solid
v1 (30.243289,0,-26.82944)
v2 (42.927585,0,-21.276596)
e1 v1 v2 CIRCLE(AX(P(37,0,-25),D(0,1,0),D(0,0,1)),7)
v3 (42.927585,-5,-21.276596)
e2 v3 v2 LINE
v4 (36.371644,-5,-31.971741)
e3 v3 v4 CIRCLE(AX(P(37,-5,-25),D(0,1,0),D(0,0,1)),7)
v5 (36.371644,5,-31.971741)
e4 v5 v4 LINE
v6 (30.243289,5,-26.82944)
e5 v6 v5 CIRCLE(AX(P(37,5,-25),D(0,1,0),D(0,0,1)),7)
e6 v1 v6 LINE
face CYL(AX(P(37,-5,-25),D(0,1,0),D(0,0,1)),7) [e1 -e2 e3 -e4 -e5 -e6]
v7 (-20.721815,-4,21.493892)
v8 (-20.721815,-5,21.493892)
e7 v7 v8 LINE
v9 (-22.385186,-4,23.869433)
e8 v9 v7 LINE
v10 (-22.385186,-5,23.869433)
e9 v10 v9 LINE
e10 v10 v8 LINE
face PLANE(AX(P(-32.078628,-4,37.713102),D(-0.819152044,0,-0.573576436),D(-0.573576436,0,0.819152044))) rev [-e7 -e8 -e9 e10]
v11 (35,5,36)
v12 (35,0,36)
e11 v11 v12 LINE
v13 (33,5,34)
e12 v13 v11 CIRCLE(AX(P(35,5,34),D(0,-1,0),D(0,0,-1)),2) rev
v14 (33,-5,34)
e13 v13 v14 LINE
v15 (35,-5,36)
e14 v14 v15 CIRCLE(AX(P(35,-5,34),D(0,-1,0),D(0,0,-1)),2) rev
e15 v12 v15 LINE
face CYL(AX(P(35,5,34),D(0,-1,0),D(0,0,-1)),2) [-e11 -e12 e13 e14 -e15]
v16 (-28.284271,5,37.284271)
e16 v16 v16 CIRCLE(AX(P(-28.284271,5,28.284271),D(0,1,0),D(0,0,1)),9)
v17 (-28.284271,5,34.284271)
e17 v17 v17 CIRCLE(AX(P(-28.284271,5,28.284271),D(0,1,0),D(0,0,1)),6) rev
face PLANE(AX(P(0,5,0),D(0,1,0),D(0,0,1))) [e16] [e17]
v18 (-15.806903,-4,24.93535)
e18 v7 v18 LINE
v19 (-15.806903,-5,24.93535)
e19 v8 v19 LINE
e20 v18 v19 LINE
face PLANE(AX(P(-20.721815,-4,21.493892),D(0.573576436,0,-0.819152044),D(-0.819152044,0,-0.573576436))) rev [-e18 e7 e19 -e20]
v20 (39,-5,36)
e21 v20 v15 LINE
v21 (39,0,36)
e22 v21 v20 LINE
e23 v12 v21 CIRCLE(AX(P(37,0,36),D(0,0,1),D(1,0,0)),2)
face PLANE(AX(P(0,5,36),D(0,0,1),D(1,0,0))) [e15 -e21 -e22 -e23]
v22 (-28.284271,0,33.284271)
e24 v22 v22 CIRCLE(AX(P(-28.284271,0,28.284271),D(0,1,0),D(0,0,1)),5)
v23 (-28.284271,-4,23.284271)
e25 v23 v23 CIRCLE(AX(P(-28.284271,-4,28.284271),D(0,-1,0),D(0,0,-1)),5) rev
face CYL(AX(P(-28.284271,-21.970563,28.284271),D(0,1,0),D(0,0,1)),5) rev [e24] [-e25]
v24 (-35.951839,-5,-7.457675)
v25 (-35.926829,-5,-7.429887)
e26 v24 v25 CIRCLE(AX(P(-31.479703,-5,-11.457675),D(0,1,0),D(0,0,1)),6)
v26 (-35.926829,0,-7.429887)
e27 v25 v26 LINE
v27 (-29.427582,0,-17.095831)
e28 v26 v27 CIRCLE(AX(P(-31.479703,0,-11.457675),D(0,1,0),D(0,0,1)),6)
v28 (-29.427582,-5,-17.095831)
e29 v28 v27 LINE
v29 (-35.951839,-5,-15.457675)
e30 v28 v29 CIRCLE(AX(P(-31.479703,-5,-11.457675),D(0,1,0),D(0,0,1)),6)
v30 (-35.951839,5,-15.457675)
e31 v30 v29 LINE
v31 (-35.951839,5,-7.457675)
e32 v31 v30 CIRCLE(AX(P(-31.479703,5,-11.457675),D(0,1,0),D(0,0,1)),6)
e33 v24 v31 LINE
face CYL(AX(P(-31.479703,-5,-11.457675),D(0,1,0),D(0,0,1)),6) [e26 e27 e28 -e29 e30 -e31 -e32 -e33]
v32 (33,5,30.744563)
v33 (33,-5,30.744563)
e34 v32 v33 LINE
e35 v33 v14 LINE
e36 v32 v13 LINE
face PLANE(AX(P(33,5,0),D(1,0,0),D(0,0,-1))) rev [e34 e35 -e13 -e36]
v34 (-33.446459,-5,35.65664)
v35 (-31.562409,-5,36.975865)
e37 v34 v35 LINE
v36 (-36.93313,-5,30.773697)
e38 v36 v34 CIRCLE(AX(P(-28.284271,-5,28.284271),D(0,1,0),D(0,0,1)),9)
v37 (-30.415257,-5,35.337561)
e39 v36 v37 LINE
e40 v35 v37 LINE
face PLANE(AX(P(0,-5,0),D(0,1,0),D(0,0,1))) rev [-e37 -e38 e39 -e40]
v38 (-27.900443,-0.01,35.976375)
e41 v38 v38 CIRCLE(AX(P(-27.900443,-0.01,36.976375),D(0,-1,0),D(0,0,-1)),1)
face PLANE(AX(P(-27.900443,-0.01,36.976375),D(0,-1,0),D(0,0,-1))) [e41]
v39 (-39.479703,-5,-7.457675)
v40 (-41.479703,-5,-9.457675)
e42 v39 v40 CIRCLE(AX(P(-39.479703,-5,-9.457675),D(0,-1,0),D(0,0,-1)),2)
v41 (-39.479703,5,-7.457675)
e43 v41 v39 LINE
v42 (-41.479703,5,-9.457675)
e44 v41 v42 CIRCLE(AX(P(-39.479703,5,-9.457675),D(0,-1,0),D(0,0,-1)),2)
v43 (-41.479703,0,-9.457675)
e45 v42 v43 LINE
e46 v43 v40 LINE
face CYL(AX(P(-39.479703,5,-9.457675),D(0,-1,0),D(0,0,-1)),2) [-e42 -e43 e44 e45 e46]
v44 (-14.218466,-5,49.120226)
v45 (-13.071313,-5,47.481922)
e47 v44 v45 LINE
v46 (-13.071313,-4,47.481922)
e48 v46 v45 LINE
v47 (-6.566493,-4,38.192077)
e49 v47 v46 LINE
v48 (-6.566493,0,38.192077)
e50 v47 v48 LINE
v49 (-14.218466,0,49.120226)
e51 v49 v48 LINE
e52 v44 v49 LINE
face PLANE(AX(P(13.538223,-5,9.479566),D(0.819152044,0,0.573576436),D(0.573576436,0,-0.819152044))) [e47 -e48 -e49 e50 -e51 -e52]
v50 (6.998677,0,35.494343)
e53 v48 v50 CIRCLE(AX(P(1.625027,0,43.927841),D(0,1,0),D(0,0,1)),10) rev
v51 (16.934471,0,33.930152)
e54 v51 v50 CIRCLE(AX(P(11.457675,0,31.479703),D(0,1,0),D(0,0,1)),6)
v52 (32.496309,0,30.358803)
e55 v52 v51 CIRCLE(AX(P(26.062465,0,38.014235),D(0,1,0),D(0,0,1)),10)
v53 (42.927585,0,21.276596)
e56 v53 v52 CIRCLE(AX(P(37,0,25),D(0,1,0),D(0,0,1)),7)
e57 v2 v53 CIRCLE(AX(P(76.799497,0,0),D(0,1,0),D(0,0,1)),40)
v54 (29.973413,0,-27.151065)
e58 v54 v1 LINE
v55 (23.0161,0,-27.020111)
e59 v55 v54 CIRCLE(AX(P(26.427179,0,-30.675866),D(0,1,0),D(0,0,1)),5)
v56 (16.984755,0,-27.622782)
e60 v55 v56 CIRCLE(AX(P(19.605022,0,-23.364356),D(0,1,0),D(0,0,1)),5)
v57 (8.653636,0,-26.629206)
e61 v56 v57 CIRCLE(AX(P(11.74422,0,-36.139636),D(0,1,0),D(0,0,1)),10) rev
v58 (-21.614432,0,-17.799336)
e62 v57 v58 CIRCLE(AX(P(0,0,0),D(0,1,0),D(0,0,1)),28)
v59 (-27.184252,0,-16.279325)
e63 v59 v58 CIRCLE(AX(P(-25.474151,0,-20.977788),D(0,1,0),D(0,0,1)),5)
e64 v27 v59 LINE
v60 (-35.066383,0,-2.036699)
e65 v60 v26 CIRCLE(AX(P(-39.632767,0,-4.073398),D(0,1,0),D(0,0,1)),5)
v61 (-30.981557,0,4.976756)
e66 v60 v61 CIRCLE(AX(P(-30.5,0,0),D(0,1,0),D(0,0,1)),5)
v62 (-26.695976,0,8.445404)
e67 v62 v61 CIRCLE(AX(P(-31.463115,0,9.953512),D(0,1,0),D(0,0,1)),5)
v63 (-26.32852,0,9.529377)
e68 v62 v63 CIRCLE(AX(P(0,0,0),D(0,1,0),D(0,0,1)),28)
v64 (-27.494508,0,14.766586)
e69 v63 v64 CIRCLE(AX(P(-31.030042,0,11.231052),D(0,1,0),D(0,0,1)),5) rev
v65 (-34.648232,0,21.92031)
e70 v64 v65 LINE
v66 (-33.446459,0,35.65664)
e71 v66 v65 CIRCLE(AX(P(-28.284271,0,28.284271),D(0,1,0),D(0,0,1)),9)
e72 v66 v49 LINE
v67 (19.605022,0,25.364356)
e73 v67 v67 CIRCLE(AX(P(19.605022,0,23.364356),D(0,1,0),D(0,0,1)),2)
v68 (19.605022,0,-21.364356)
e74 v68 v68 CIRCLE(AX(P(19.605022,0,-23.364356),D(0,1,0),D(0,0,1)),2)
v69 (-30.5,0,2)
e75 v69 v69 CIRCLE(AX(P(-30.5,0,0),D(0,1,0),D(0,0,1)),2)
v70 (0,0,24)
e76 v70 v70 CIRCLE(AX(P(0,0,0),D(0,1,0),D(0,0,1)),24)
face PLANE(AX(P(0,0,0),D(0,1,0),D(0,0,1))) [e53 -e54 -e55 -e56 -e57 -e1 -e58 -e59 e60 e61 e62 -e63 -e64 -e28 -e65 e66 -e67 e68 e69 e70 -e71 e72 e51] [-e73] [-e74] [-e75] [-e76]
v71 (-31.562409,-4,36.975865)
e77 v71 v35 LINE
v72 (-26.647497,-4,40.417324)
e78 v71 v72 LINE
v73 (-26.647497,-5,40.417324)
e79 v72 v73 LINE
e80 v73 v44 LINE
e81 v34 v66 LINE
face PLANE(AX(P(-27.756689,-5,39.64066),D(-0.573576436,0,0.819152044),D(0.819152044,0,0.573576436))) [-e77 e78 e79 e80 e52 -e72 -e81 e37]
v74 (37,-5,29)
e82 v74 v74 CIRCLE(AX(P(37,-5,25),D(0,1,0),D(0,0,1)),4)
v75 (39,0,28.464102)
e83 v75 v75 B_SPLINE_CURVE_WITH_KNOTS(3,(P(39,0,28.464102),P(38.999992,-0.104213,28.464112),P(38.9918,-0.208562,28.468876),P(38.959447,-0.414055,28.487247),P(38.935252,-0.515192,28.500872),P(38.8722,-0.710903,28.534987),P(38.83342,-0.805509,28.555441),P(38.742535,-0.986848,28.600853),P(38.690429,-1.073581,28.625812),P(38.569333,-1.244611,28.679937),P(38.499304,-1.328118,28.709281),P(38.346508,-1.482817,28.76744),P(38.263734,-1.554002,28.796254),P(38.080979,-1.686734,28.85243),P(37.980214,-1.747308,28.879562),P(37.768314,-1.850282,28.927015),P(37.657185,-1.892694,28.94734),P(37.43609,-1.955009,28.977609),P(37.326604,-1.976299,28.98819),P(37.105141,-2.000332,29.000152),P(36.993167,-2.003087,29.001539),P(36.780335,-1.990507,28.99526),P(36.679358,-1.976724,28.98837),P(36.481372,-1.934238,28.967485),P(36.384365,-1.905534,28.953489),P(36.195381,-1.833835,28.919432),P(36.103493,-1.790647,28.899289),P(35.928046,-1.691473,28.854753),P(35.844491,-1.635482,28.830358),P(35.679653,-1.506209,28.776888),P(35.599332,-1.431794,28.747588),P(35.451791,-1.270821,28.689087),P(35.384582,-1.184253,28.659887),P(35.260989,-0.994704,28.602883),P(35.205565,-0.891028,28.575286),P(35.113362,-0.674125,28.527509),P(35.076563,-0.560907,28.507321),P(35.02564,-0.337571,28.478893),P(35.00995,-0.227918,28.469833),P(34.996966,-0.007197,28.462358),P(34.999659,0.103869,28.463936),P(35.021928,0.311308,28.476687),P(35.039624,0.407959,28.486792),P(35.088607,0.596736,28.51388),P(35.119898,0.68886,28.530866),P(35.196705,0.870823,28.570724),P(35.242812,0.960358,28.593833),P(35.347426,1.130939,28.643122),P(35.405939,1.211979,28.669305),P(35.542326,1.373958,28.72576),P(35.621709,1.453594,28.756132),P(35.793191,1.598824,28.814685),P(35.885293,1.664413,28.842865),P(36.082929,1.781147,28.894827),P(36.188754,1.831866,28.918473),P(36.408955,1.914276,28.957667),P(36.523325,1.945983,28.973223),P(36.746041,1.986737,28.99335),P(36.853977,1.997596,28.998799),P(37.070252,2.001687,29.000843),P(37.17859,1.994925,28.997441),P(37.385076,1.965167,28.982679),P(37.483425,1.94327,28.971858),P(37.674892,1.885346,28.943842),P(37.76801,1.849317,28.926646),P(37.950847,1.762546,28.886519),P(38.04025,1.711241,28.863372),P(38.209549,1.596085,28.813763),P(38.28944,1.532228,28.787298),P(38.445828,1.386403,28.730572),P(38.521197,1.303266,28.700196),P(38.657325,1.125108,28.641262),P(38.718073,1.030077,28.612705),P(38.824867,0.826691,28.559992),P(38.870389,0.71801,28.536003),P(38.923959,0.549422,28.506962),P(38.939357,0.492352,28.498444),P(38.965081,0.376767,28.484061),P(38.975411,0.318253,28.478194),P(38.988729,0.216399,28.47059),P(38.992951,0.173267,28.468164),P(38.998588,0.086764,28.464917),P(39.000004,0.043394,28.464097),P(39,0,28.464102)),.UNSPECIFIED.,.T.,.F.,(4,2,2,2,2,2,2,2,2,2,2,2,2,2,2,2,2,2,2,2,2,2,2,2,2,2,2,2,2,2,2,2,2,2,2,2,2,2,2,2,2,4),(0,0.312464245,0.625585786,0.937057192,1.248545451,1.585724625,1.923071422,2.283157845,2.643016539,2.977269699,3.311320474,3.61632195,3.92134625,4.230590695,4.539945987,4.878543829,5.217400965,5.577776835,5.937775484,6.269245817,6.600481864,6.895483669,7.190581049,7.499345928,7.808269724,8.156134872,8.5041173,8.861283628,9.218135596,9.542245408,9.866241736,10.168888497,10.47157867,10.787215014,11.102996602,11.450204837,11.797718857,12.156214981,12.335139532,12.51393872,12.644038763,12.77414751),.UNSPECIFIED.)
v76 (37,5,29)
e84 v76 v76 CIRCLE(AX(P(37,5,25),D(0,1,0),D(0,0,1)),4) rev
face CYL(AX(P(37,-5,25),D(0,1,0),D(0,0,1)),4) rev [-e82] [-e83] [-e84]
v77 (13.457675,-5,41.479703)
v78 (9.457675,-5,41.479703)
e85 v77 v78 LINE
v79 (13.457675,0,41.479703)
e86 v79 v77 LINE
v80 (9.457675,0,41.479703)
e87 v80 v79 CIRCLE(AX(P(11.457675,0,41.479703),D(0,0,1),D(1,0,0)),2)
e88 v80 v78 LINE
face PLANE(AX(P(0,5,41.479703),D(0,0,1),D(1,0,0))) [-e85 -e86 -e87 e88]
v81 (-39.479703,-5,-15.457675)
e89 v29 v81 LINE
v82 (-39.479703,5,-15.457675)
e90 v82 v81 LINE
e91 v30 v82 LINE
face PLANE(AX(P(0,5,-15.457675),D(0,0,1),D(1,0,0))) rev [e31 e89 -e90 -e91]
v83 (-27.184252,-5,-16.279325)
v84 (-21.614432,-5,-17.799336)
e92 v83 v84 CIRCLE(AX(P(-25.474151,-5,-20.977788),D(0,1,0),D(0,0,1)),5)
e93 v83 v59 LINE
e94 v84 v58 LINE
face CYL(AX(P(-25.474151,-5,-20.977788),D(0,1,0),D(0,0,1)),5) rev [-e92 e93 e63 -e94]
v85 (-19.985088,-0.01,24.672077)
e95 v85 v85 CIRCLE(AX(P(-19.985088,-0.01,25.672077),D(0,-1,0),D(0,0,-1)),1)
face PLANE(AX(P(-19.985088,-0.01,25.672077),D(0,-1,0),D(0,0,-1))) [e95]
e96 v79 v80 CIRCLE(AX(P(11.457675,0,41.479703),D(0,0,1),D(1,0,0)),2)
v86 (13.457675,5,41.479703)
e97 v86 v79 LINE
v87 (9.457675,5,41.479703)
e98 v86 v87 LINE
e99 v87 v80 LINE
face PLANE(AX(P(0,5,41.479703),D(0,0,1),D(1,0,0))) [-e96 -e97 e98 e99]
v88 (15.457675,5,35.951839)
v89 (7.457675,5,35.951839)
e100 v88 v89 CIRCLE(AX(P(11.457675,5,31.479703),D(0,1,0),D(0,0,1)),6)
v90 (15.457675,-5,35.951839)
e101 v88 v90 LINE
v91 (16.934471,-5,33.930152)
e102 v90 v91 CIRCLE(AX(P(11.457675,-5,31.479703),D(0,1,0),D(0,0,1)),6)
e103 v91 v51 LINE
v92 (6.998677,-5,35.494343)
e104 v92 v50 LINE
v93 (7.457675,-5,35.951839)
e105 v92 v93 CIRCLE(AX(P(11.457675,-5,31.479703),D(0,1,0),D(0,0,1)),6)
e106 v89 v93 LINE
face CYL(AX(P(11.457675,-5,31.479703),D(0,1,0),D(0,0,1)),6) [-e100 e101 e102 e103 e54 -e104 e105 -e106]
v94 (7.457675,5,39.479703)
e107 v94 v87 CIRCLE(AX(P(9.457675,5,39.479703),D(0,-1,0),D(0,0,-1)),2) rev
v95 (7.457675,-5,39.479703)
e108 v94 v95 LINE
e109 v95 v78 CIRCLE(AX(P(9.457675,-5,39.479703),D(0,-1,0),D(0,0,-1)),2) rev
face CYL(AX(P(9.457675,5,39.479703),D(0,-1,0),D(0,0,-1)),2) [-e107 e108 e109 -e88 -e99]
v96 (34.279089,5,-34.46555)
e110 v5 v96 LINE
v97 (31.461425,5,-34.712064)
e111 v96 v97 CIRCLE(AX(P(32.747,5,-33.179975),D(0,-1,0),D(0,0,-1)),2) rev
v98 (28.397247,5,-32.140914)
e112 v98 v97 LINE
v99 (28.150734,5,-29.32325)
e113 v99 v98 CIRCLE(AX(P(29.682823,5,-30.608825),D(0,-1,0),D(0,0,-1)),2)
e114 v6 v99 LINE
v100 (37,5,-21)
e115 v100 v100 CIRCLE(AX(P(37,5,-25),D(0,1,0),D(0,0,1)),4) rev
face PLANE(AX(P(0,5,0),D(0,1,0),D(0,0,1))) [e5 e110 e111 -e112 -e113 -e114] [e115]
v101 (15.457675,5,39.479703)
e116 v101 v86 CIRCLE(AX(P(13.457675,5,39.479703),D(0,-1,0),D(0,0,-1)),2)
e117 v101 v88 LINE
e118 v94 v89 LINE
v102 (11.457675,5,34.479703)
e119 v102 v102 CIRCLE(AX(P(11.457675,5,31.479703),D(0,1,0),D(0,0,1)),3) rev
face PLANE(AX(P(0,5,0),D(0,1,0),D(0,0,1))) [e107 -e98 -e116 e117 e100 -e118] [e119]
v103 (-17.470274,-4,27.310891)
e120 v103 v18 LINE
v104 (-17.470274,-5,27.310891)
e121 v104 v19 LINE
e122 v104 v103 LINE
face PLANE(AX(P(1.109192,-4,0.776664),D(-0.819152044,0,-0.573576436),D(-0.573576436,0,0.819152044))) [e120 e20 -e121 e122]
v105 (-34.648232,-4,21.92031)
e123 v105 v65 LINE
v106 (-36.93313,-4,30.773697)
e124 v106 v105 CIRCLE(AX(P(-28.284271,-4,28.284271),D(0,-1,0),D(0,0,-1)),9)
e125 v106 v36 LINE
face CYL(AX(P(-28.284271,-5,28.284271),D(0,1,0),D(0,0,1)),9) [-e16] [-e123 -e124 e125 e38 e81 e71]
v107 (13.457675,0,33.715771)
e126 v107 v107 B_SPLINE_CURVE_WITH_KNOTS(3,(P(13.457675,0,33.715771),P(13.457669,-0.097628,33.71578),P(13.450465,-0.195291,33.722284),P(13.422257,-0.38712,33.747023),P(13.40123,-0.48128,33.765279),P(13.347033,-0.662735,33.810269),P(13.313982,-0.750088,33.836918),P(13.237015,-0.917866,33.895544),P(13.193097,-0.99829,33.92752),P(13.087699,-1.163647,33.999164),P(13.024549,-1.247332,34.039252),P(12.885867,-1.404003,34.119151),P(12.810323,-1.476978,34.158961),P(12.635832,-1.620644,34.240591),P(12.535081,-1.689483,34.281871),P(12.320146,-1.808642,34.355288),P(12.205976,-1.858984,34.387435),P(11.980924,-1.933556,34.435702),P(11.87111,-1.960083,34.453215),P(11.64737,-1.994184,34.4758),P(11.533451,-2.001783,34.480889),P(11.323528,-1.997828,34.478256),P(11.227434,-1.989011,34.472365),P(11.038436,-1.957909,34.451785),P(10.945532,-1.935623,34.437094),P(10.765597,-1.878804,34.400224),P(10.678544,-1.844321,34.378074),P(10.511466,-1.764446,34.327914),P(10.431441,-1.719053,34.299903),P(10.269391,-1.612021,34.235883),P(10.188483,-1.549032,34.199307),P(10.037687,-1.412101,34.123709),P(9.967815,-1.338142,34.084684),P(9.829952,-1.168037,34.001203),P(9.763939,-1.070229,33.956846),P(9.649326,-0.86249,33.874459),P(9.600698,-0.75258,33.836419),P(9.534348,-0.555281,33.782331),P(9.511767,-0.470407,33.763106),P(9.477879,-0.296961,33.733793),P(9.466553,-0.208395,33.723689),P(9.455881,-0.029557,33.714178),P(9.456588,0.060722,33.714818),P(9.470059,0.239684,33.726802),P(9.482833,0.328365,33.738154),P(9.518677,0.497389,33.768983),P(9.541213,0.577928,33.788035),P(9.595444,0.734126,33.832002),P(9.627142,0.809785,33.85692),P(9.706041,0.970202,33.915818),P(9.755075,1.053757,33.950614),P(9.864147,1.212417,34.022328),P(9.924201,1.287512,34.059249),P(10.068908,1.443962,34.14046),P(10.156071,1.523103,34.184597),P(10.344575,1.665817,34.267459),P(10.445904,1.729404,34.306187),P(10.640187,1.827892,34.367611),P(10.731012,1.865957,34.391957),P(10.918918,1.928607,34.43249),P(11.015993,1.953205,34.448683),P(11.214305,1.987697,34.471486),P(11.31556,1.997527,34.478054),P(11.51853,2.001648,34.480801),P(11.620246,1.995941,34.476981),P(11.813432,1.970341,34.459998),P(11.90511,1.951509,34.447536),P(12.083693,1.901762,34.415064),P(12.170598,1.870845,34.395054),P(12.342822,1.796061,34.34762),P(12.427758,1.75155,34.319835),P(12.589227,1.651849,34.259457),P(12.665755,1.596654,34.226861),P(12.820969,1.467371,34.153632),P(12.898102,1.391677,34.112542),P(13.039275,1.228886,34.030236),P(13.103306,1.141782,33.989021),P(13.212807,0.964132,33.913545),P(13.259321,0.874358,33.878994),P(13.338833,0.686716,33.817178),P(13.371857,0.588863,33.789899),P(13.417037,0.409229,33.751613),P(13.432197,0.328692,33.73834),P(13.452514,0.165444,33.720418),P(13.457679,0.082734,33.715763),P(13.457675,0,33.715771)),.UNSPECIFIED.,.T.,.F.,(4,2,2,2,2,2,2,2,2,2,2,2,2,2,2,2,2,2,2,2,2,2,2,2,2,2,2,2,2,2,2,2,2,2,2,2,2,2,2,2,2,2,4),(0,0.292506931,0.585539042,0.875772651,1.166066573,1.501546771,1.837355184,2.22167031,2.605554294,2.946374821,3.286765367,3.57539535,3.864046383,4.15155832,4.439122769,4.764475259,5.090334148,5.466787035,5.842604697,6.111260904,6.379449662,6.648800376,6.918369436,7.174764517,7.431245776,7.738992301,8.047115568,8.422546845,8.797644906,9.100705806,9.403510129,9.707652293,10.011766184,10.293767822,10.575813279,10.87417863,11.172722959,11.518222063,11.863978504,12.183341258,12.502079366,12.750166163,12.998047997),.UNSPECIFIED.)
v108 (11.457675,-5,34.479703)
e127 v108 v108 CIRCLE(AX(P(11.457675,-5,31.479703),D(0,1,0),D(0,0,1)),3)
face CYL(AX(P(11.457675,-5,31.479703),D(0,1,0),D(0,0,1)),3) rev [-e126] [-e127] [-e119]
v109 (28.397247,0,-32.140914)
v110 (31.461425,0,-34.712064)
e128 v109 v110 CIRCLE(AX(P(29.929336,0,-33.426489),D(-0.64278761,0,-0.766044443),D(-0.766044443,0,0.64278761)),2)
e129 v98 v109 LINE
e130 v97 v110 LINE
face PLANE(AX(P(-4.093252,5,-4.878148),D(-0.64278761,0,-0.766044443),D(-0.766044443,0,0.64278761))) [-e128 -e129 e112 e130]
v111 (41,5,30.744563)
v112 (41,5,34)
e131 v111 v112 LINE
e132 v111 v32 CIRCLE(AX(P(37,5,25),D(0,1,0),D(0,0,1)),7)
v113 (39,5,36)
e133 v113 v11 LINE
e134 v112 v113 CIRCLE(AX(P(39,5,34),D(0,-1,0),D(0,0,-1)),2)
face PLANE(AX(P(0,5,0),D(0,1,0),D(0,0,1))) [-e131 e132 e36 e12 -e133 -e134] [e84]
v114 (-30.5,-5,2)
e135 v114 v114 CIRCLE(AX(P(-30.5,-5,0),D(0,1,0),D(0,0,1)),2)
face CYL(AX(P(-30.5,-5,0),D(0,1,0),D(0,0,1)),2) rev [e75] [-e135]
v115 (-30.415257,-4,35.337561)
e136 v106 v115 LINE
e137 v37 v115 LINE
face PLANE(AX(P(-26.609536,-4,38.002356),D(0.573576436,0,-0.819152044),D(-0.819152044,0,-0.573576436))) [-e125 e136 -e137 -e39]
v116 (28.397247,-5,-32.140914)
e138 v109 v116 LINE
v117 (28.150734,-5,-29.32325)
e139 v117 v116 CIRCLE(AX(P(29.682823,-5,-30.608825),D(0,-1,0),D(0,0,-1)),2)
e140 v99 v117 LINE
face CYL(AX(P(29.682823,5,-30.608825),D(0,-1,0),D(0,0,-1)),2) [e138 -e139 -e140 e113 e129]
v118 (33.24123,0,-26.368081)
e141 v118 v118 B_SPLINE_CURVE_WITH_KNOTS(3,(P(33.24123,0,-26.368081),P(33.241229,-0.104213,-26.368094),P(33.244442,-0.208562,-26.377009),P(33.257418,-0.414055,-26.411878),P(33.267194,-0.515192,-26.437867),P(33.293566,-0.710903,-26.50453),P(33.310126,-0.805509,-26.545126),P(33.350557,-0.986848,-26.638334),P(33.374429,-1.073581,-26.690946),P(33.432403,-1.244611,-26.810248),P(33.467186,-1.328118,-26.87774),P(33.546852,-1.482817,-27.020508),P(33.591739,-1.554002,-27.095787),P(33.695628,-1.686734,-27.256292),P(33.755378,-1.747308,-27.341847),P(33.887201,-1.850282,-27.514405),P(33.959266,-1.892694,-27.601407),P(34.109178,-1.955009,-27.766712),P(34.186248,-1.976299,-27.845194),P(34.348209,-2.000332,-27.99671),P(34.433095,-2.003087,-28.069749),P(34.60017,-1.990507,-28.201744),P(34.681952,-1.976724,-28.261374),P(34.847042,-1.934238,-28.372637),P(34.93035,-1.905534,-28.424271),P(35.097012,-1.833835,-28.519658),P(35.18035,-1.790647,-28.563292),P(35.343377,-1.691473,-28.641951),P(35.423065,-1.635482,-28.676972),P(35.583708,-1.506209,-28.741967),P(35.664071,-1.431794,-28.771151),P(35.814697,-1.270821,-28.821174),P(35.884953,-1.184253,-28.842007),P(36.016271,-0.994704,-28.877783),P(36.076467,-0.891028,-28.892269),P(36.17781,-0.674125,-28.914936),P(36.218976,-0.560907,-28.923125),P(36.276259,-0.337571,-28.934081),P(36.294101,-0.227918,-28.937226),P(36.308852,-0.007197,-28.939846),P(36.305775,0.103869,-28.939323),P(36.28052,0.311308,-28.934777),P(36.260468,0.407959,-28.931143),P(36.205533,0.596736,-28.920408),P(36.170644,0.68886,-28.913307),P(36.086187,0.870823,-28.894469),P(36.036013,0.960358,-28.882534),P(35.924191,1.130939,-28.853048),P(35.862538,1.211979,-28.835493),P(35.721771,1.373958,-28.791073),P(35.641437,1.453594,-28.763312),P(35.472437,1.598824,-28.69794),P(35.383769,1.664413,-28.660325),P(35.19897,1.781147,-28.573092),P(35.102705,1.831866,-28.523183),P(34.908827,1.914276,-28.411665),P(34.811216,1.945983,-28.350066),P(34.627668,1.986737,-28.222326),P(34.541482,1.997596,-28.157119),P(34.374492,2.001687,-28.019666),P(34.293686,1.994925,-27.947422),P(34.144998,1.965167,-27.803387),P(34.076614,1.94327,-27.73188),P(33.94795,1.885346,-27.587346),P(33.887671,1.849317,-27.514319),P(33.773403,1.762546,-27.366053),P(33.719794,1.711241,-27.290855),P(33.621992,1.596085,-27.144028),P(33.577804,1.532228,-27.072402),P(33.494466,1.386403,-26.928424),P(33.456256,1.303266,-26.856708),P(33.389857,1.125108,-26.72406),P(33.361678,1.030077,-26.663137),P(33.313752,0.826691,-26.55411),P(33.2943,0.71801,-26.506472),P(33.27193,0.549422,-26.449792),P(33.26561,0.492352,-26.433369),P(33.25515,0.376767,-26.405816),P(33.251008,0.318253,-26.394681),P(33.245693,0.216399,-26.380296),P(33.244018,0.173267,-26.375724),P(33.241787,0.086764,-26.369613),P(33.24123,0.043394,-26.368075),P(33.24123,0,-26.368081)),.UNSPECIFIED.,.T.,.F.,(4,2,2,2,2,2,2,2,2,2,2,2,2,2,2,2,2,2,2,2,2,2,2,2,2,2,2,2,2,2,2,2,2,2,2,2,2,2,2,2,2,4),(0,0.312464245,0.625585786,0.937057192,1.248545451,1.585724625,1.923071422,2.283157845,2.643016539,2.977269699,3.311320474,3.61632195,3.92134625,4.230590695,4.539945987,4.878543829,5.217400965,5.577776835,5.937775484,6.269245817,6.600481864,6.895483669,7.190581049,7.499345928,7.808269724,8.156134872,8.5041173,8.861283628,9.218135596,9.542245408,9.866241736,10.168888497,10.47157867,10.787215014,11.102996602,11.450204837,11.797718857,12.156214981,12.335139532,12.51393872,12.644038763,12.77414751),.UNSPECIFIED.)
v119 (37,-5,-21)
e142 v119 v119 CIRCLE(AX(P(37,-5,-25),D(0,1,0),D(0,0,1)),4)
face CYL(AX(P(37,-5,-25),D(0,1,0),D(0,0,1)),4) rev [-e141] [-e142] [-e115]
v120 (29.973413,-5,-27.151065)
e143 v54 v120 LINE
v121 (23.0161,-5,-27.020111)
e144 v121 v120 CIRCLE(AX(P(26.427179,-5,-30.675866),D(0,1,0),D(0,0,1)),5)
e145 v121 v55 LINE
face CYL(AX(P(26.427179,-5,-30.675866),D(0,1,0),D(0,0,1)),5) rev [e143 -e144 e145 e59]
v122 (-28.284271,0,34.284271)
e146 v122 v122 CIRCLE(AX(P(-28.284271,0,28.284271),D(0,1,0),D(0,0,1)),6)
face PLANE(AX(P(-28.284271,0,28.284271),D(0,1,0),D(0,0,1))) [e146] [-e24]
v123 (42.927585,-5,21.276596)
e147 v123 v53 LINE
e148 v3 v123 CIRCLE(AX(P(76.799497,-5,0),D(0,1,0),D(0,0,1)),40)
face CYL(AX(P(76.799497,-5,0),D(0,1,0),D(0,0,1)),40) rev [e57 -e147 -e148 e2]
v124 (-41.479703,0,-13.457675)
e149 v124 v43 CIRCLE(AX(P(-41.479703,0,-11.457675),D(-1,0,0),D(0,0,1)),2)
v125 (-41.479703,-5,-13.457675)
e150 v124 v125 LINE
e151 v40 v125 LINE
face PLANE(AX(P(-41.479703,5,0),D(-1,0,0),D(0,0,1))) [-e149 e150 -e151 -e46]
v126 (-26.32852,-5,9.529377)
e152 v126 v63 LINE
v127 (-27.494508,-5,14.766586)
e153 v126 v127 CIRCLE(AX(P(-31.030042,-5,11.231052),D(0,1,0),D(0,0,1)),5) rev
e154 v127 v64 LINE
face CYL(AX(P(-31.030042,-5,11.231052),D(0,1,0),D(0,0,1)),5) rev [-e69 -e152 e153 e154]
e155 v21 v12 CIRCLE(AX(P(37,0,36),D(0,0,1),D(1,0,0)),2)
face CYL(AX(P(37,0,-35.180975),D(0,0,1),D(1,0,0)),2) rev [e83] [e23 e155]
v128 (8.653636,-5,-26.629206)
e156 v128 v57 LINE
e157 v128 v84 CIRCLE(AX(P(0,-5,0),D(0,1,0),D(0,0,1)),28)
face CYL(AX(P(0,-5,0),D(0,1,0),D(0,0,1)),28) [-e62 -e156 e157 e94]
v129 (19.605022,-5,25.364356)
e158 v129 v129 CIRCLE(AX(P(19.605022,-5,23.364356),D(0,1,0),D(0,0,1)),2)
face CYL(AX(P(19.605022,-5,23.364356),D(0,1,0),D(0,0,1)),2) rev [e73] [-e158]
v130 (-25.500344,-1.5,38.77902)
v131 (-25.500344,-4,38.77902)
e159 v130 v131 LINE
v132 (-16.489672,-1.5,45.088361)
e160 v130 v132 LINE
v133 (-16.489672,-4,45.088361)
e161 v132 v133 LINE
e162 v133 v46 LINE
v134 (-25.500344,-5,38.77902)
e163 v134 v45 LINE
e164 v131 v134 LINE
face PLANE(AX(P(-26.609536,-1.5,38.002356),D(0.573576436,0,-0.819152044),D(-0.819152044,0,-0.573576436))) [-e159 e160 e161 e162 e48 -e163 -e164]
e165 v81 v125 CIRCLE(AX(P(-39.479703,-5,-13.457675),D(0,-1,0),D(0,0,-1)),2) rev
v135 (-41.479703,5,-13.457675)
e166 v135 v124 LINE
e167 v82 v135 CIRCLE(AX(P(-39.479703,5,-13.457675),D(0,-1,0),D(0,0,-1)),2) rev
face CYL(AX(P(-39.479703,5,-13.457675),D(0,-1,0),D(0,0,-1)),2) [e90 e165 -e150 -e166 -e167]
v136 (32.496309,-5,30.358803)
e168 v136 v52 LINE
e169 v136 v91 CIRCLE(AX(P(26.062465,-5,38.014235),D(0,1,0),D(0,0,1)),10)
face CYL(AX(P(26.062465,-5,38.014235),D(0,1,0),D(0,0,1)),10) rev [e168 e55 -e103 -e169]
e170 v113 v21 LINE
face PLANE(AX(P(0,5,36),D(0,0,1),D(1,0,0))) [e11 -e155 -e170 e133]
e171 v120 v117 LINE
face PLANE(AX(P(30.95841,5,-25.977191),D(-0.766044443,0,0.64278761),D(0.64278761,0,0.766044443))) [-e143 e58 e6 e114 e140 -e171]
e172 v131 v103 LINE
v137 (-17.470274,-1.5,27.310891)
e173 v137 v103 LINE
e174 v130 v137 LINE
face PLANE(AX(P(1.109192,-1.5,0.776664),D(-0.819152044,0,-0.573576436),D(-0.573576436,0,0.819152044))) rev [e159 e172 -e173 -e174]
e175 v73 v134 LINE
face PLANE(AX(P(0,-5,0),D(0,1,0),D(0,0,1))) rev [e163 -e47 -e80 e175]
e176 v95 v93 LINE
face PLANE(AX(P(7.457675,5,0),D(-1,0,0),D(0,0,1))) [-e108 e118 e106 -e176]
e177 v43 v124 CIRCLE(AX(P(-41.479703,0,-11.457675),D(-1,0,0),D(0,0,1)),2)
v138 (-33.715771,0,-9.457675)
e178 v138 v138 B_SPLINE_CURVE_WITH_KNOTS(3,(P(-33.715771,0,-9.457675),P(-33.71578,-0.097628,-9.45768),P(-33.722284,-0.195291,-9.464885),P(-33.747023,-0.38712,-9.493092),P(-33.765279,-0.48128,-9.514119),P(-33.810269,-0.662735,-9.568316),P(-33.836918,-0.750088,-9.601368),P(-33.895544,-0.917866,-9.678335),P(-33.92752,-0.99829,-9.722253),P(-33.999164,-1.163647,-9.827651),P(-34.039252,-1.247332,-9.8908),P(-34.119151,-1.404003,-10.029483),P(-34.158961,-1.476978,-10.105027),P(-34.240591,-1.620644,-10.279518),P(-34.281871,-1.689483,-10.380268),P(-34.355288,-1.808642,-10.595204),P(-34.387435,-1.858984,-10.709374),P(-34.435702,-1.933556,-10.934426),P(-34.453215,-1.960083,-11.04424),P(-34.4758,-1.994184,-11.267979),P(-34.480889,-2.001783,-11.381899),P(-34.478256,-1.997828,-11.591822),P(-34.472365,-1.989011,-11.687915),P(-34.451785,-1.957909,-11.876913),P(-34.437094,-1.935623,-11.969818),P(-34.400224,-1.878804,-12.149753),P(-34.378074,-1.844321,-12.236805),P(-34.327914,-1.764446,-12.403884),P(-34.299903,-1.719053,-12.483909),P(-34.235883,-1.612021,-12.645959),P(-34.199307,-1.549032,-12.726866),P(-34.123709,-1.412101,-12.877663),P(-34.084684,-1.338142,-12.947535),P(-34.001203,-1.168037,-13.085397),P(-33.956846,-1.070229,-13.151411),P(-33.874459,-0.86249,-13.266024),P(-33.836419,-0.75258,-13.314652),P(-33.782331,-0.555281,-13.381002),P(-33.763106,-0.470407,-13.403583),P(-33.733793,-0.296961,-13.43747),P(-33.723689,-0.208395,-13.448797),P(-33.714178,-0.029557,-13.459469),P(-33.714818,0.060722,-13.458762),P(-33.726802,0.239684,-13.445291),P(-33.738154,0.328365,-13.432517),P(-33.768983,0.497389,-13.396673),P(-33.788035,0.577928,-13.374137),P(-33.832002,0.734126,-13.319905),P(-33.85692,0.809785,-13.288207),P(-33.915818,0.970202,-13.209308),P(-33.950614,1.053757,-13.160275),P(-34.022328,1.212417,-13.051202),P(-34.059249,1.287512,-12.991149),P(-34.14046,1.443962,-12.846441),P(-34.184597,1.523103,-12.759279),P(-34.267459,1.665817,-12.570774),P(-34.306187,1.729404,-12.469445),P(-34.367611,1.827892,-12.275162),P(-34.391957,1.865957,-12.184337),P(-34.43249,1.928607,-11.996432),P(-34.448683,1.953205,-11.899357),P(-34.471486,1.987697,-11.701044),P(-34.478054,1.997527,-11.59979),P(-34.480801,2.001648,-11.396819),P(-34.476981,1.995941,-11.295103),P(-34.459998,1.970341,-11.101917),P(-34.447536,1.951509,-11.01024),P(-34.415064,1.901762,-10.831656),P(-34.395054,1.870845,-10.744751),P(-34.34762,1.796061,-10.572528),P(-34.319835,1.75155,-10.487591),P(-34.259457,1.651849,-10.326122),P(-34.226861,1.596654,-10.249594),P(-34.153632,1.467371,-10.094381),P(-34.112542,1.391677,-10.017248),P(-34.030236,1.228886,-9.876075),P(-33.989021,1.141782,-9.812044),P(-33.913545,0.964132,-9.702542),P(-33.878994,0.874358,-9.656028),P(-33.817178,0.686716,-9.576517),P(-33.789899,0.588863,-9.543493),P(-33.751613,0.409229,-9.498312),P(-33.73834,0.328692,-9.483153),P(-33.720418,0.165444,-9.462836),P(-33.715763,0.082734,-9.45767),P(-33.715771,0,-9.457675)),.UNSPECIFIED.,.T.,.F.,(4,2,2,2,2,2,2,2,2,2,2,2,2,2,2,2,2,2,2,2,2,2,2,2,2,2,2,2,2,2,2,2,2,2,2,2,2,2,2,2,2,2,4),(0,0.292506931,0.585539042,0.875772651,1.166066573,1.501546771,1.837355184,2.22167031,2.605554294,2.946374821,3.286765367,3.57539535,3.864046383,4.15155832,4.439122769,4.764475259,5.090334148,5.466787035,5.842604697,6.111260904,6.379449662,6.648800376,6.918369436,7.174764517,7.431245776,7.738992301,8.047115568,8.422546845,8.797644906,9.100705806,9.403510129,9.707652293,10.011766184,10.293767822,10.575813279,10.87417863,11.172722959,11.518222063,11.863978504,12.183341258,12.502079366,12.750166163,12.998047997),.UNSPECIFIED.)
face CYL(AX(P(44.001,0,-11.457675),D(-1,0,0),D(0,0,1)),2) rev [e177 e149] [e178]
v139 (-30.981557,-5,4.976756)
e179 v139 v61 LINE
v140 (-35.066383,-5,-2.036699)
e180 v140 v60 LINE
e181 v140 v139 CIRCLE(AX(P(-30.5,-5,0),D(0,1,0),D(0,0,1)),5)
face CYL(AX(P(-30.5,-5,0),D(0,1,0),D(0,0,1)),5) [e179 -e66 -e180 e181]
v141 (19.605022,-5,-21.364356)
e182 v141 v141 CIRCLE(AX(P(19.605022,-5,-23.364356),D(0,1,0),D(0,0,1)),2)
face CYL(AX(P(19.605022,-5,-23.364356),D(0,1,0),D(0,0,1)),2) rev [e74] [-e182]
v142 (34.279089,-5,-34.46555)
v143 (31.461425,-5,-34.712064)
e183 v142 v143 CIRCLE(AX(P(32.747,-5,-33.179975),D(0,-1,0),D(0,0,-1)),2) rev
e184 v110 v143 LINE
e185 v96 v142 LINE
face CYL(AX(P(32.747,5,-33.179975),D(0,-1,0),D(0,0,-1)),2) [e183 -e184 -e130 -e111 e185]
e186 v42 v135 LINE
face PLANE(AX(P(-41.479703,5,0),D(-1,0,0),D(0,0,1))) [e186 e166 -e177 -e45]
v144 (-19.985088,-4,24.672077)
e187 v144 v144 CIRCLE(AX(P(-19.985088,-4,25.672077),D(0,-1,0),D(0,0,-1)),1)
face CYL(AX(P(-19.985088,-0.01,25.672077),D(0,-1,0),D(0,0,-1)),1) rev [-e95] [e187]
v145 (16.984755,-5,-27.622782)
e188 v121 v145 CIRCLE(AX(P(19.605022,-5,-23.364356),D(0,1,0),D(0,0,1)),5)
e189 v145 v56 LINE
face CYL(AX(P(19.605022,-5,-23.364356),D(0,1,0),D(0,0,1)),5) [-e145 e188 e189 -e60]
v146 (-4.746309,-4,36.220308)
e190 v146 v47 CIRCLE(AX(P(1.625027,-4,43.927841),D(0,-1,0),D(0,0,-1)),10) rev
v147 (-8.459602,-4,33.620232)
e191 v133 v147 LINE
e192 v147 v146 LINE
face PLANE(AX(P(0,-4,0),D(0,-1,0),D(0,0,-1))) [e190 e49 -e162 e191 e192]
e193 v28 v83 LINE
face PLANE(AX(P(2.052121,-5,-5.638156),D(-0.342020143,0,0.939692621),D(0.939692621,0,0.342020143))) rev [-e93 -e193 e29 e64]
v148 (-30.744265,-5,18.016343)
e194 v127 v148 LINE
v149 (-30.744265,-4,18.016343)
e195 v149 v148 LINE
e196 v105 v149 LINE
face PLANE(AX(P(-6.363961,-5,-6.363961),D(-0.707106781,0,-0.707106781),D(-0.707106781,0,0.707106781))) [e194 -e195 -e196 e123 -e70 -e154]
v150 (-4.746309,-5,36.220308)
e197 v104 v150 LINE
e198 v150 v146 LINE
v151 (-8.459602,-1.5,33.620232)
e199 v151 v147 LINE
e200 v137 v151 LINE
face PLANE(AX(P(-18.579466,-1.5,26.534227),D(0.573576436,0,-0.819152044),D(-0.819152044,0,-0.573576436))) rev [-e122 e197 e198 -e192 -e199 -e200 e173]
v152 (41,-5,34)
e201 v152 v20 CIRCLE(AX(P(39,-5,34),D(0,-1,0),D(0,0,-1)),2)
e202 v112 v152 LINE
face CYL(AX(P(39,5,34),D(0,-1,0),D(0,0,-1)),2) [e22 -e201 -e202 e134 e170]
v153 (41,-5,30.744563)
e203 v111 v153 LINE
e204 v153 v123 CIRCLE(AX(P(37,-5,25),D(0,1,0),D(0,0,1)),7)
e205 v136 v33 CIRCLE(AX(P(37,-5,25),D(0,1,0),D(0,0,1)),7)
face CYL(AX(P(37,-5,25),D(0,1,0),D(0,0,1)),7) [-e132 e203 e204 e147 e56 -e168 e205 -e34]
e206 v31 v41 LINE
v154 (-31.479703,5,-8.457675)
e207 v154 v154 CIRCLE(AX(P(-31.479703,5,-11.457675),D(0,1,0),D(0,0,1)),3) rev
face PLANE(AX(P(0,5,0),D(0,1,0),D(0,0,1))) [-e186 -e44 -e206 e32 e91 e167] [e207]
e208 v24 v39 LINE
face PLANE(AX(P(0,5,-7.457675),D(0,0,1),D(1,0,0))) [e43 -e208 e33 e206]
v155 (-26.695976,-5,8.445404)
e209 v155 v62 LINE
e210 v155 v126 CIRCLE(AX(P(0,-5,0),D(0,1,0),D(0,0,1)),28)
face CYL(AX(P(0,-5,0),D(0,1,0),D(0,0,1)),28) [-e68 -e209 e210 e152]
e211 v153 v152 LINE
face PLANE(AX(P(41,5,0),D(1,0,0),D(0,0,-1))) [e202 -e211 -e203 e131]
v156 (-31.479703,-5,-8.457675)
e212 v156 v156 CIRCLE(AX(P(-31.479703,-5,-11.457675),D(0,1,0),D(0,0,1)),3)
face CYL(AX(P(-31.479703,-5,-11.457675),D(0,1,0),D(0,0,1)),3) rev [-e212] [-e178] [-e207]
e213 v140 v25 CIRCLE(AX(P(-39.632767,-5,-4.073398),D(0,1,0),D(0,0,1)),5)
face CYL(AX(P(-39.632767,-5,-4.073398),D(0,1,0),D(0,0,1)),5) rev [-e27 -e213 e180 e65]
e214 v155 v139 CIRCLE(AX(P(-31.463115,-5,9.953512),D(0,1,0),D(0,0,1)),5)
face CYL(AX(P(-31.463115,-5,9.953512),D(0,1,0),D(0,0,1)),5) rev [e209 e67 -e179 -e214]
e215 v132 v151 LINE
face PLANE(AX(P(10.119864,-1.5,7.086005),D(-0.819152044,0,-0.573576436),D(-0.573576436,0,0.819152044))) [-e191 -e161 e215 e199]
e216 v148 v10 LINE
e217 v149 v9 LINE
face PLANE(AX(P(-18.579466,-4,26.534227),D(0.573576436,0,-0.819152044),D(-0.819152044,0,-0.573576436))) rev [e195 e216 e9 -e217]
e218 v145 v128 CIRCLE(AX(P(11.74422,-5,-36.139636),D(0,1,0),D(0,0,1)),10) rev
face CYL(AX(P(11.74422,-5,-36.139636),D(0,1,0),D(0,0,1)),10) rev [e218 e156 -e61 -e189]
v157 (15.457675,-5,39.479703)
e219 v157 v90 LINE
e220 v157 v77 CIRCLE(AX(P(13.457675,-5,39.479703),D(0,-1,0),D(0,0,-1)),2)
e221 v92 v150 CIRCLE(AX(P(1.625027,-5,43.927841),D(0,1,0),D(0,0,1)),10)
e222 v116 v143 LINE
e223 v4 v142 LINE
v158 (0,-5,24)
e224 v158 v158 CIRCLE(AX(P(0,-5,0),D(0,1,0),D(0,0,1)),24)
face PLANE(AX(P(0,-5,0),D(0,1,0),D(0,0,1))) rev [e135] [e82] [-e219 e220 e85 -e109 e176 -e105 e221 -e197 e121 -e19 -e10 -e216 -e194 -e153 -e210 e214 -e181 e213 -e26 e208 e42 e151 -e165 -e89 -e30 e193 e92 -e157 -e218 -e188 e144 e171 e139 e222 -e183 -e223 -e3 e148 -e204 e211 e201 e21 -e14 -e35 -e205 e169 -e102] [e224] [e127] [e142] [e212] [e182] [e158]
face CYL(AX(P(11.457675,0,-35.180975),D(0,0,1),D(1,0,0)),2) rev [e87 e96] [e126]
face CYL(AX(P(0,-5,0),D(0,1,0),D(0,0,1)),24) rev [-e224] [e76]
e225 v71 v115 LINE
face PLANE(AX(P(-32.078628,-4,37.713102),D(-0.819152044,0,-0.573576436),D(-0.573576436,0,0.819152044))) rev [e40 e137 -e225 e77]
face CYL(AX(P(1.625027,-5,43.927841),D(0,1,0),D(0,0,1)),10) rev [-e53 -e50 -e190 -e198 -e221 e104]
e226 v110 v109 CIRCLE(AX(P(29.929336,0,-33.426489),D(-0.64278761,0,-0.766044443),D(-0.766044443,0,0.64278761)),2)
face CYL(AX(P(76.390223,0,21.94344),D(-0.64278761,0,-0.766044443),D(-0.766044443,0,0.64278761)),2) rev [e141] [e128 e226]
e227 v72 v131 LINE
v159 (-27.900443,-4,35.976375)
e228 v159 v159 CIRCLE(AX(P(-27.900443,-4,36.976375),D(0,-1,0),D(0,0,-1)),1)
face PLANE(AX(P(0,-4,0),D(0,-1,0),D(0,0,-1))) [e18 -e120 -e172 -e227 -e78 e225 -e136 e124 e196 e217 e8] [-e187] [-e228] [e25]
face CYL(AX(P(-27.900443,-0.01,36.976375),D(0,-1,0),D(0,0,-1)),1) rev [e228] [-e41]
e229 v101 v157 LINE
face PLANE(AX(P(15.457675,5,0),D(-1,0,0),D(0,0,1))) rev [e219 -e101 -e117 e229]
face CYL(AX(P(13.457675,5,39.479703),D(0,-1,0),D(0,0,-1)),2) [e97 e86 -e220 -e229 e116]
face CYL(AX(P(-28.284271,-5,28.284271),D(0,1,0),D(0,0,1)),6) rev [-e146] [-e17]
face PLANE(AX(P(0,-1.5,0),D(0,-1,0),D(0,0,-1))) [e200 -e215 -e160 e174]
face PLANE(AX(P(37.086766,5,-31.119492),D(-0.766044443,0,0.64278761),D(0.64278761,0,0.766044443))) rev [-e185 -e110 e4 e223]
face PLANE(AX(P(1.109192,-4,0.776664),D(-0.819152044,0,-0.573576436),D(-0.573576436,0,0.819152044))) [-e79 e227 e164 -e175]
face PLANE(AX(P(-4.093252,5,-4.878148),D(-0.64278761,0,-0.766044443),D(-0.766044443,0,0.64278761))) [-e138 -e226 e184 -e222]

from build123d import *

# Parameters (mm, degrees)
SKETCH1_R               = 2
SKETCH1_R_2             = 3
SKETCH1_R_3             = 24
SKETCH1_R_4             = 4
SKETCH1_R_5             = 6
BOSS_EXTRUDE1_DEPTH     = 5
BOSS_EXTRUDE2_START     = 5
SKETCH2_R               = 6
SKETCH2_R_2             = 3
SKETCH2_R_3             = 9
SKETCH2_R_4             = 7
SKETCH2_R_5             = 4
BOSS_EXTRUDE2_DEPTH     = 5
SKETCH2_3_R             = 6
SKETCH2_3_R_2           = 5
BOSS_EXTRUDE3_DEPTH     = 5
CUT_EXTRUDE1_DEPTH      = 3.5
CUT_EXTRUDE2_START      = -1
SKETCH3_3_R             = 5
CUT_EXTRUDE2_DEPTH      = 1
SKETCH3_4_R             = 1
CUT_EXTRUDE3_DEPTH      = 4.99
BOSS_EXTRUDE4_START     = -10
BOSS_EXTRUDE4_DEPTH     = 10
CUT_EXTRUDE5_REACH      = 100.715
CUT_EXTRUDE5_END_RADIUS = 3
SKETCH5_R               = 2
CUT_EXTRUDE6_REACH      = 85.831
CUT_EXTRUDE6_END_RADIUS = 4
SKETCH8_R               = 2
CUT_EXTRUDE7_REACH      = 74.483
CUT_EXTRUDE7_END_RADIUS = 4
SKETCH7_R               = 2
CUT_EXTRUDE8_REACH      = 90.531
CUT_EXTRUDE8_END_RADIUS = 3
SKETCH6_R               = 2
FILLET1_R               = 10


with BuildPart() as part:
    # Sketch1 → Boss-Extrude1 (new body)
    with BuildSketch(Plane(origin=(0, 0, 0), x_dir=(1, 0, 0), z_dir=(0, 1, 0))):
        with BuildLine():
            Line((-27.184252213, 16.279325281), (-29.427581936, 17.095830526))
            ThreePointArc((-29.427581936, 17.095830526), (-36.458821852, 14.805565694), (-35.926828641, 7.429887354))
            ThreePointArc((-35.926828641, 7.429887354), (-34.695212118, 4.861149883), (-35.066383422, 2.036698907))
            ThreePointArc((-35.066383422, 2.036698907), (-34.820597735, -2.516433033), (-30.981557377, -4.976756222))
            ThreePointArc((-30.981557377, -4.976756222), (-28.317469736, -6.067007919), (-26.695976155, -8.445404498))
            ThreePointArc((-26.695976155, -8.445404498), (-26.517787426, -8.989268605), (-26.328520099, -9.529377177))
            ThreePointArc((-26.328520099, -9.529377177), (-26.149533562, -12.317625103), (-27.49450764, -14.766585578))
            Line((-27.49450764, -14.766585578), (-34.648232278, -21.920310217))
            ThreePointArc((-34.648232278, -21.920310217), (-37.25002353, -29.068672932), (-33.446459175, -35.656639646))
            Line((-33.446459175, -35.656639646), (-14.21846567, -49.120225643))
            Line((-14.21846567, -49.120225643), (-0.916023693, -30.122369648))
            ThreePointArc((-0.916023693, -30.122369648), (3.367217791, -32.328210757), (6.998677081, -35.494343419))
            ThreePointArc((6.998677081, -35.494343419), (12.390762018, -37.40670442), (16.93447098, -33.930152473))
            ThreePointArc((16.93447098, -33.930152473), (23.825671194, -28.267607379), (32.496308957, -30.358802757))
            ThreePointArc((32.496308957, -30.358802757), (41.596573655, -30.279347558), (42.927584732, -21.276595745))
            ThreePointArc((42.927584732, -21.276595745), (36.799497484, 0), (42.927584732, 21.276595745))
            ThreePointArc((42.927584732, 21.276595745), (40.519207625, 31.051047652), (30.832520912, 28.310921578))
            ThreePointArc((30.832520912, 28.310921578), (27.241849474, 25.742680837), (23.016100401, 27.020110539))
            ThreePointArc((23.016100401, 27.020110539), (20.102162754, 28.339579245), (16.984754776, 27.622782358))
            ThreePointArc((16.984754776, 27.622782358), (12.928437353, 26.210002133), (8.653635891, 26.629205506))
            ThreePointArc((8.653635891, 26.629205506), (-7.841377865, 26.879598084), (-21.614431573, 17.7993356))
            ThreePointArc((-21.614431573, 17.7993356), (-24.157783947, 16.154182216), (-27.184252213, 16.279325281))
        make_face()
        with Locations(Location((19.605022095, -23.364355515, 0), (0, 0, 270))):
            Circle(SKETCH1_R, mode=Mode.SUBTRACT)
        with Locations(Location((-30.5, 0, 0), (0, 0, 270))):
            Circle(SKETCH1_R, mode=Mode.SUBTRACT)
        with Locations(Location((-31.479702796, 11.457674801, 0), (0, 0, 270))):
            Circle(SKETCH1_R_2, mode=Mode.SUBTRACT)
        with Locations(Location((0, 0, 0), (0, 0, 270))):
            Circle(SKETCH1_R_3, mode=Mode.SUBTRACT)
        with Locations(Location((19.605022095, 23.364355515, 0), (0, 0, 270))):
            Circle(SKETCH1_R, mode=Mode.SUBTRACT)
        with Locations(Location((37, 25, 0), (0, 0, 270))):
            Circle(SKETCH1_R_4, mode=Mode.SUBTRACT)
        with Locations(Location((-28.284271247, -28.284271247, 0), (0, 0, 270))):
            Circle(SKETCH1_R_5, mode=Mode.SUBTRACT)
        with Locations(Location((37, -25, 0), (0, 0, 270))):
            Circle(SKETCH1_R_4, mode=Mode.SUBTRACT)
        with Locations(Location((11.457674801, -31.479702796, 0), (0, 0, 270))):
            Circle(SKETCH1_R_2, mode=Mode.SUBTRACT)
    extrude(amount=-BOSS_EXTRUDE1_DEPTH)

    # Sketch2 → Boss-Extrude2 (add)
    # profile 1 of 5: a face of its own
    with BuildSketch(Plane(origin=(0, 0, 0), x_dir=(1, 0, 0), z_dir=(0, 1, 0)).offset(BOSS_EXTRUDE2_START)):
        with Locations(Location((-31.479702796, 11.457674801, 0), (0, 0, 270))):
            Circle(SKETCH2_R)
        with Locations(Location((-31.479702796, 11.457674801, 0), (0, 0, 270))):
            Circle(SKETCH2_R_2, mode=Mode.SUBTRACT)
    # profile 2 of 5: a face of its own
    with BuildSketch(Plane(origin=(0, 0, 0), x_dir=(1, 0, 0), z_dir=(0, 1, 0)).offset(BOSS_EXTRUDE2_START)):
        with Locations(Location((-28.284271247, -28.284271247, 0), (0, 0, 270))):
            Circle(SKETCH2_R_3)
        with Locations(Location((-28.284271247, -28.284271247, 0), (0, 0, 270))):
            Circle(SKETCH2_R, mode=Mode.SUBTRACT)
    # profile 3 of 5: a face of its own
    with BuildSketch(Plane(origin=(0, 0, 0), x_dir=(1, 0, 0), z_dir=(0, 1, 0)).offset(BOSS_EXTRUDE2_START)):
        with Locations(Location((37, -25, 0), (0, 0, 270))):
            Circle(SKETCH2_R_4)
        with Locations(Location((37, -25, 0), (0, 0, 270))):
            Circle(SKETCH2_R_5, mode=Mode.SUBTRACT)
    # profile 4 of 5: a face of its own
    with BuildSketch(Plane(origin=(0, 0, 0), x_dir=(1, 0, 0), z_dir=(0, 1, 0)).offset(BOSS_EXTRUDE2_START)):
        with Locations(Location((11.457674801, -31.479702796, 0), (0, 0, 270))):
            Circle(SKETCH2_R)
        with Locations(Location((11.457674801, -31.479702796, 0), (0, 0, 270))):
            Circle(SKETCH2_R_2, mode=Mode.SUBTRACT)
    # profile 5 of 5: a face of its own
    with BuildSketch(Plane(origin=(0, 0, 0), x_dir=(1, 0, 0), z_dir=(0, 1, 0)).offset(BOSS_EXTRUDE2_START)):
        with Locations(Location((37, 25, 0), (0, 0, 270))):
            Circle(SKETCH2_R_4)
        with Locations(Location((37, 25, 0), (0, 0, 270))):
            Circle(SKETCH2_R_5, mode=Mode.SUBTRACT)
    extrude(amount=-BOSS_EXTRUDE2_DEPTH)

    # Sketch2<3> → Boss-Extrude3 (add)
    with BuildSketch(Plane(origin=(0, 0, 0), x_dir=(1, 0, 0), z_dir=(0, 1, 0))):
        with Locations(Location((-28.284271247, -28.284271247, 0), (0, 0, 270))):
            Circle(SKETCH2_3_R)
        with Locations(Location((-28.284271247, -28.284271247, 0), (0, 0, 270))):
            Circle(SKETCH2_3_R_2, mode=Mode.SUBTRACT)
    extrude(amount=-BOSS_EXTRUDE3_DEPTH)

    # Sketch3 → Cut-Extrude1 (cut)
    with BuildSketch(Plane.XZ.offset(5)):
        Polygon((-16.489671847, 45.088360779), (-25.500344334, 38.779019979), (-17.470274225, 27.310891359), (-8.459601738, 33.620232159), align=None)
    extrude(amount=-CUT_EXTRUDE1_DEPTH, mode=Mode.SUBTRACT)

    # Sketch3<3> → Cut-Extrude2 (cut)
    # profile 1 of 2: a face of its own
    with BuildSketch(Plane.XZ.offset(5).offset(CUT_EXTRUDE2_START)):
        with BuildLine():
            Line((-30.4152566, 35.337561361), (-36.933130025, 30.773697256))
            ThreePointArc((-36.933130025, 30.773697256), (-36.998730793, 26.035228154), (-34.648232278, 21.920310217))
            Line((-34.648232278, 21.920310217), (-30.744265011, 18.016342949))
            Line((-30.744265011, 18.016342949), (-22.385186491, 23.869432741))
            Line((-22.385186491, 23.869432741), (-20.721814826, 21.493891813))
            Line((-20.721814826, 21.493891813), (-15.80690256, 24.935350431))
            Line((-15.80690256, 24.935350431), (-26.647497207, 40.417324068))
            Line((-26.647497207, 40.417324068), (-31.562409473, 36.97586545))
            Line((-31.562409473, 36.97586545), (-30.4152566, 35.337561361))
        make_face()
        with Locations(Location((-28.284271247, 28.284271247, 0), (0, 0, 90))):
            Circle(SKETCH3_3_R, mode=Mode.SUBTRACT)
    # profile 2 of 2: a face of its own
    with BuildSketch(Plane.XZ.offset(5).offset(CUT_EXTRUDE2_START)):
        Polygon((-13.071312797, 47.481921554), (-16.489671847, 45.088360779), (-8.459601738, 33.620232159), (-5.041242688, 36.013792934), align=None)
    extrude(amount=CUT_EXTRUDE2_DEPTH, mode=Mode.SUBTRACT)

    # Sketch3<4> → Cut-Extrude3 (cut)
    with BuildSketch(Plane.XZ.offset(5)):
        with Locations(Location((-19.985088002, 25.672077255, 0), (0, 0, 270))):
            Circle(SKETCH3_4_R)
        with Locations(Location((-27.900442824, 36.976375466, 0), (0, 0, 270))):
            Circle(SKETCH3_4_R)
    extrude(amount=-CUT_EXTRUDE3_DEPTH, mode=Mode.SUBTRACT)

    # Boss-Extrude4: read off the stored shape, not the designer's step
    # Boss-Extrude4 outline → Boss-Extrude4 (add)
    with BuildSketch(Plane.XZ.offset(5).offset(BOSS_EXTRUDE4_START)):
        with BuildLine():
            Line((15.457674801, 35.951838751), (15.457674801, 39.479702796))
            ThreePointArc((15.457674801, 39.479702796), (14.871888364, 40.893916359), (13.457674801, 41.479702796))
            Line((13.457674801, 41.479702796), (9.457674801, 41.479702796))
            ThreePointArc((9.457674801, 41.479702796), (8.043461238, 40.893916359), (7.457674801, 39.479702796))
            Line((7.457674801, 39.479702796), (7.457674801, 35.951838751))
            ThreePointArc((7.457674801, 35.951838751), (11.457674801, 37.479702796), (15.457674801, 35.951838751))
        make_face()
        with BuildLine():
            ThreePointArc((33, 30.744562647), (37, 32), (41, 30.744562647))
            Line((41, 30.744562647), (41, 34))
            ThreePointArc((41, 34), (40.414213562, 35.414213562), (39, 36))
            Line((39, 36), (35, 36))
            ThreePointArc((35, 36), (33.585786438, 35.414213562), (33, 34))
            Line((33, 34), (33, 30.744562647))
        make_face()
        with BuildLine():
            Line((30.243288535, -26.829439855), (28.15073374, -29.323249549))
            ThreePointArc((28.15073374, -29.323249549), (27.69043323, -30.783136254), (28.397247407, -32.140913655))
            Line((28.397247407, -32.140913655), (31.46142518, -34.712064094))
            ThreePointArc((31.46142518, -34.712064094), (32.921311885, -35.172364604), (34.279089285, -34.465550427))
            Line((34.279089285, -34.465550427), (36.37164408, -31.971740732))
            ThreePointArc((36.37164408, -31.971740732), (32.500486732, -30.362311102), (30.243288535, -26.829439855))
        make_face()
        with BuildLine():
            ThreePointArc((-35.951838751, -15.457674801), (-37.479702796, -11.457674801), (-35.951838751, -7.457674801))
            Line((-35.951838751, -7.457674801), (-39.479702796, -7.457674801))
            ThreePointArc((-39.479702796, -7.457674801), (-40.893916359, -8.043461238), (-41.479702796, -9.457674801))
            Line((-41.479702796, -9.457674801), (-41.479702796, -13.457674801))
            ThreePointArc((-41.479702796, -13.457674801), (-40.893916359, -14.871888364), (-39.479702796, -15.457674801))
            Line((-39.479702796, -15.457674801), (-35.951838751, -15.457674801))
        make_face()
    extrude(amount=BOSS_EXTRUDE4_DEPTH)

    # Cut-Extrude5: up to this cylinder (the profile starts outside it)
    cut_extrude5_end = Plane(origin=(-31.479702796, 0, -11.457674801), z_dir=(0, 1, 0)) * Cylinder(CUT_EXTRUDE5_END_RADIUS, 208.43, mode=Mode.PRIVATE)
    # Sketch5 → Cut-Extrude5 (cut, up to the surface)
    with BuildSketch(Plane.ZY.offset(41.479702796), mode=Mode.PRIVATE) as cut_extrude5_sk1:
        with Locations((-11.457674801, 0)):
            Circle(SKETCH5_R)
    cut_extrude5_tool1 = extrude(cut_extrude5_sk1.sketch, amount=-CUT_EXTRUDE5_REACH, mode=Mode.PRIVATE) - cut_extrude5_end
    add(cut_extrude5_tool1.solids().sort_by_distance((-41.479703, 0, -11.457675))[0], mode=Mode.SUBTRACT)

    # Cut-Extrude6: up to this cylinder (the profile starts outside it)
    cut_extrude6_end = Plane(origin=(37, 0, 25), z_dir=(0, 1, 0)) * Cylinder(CUT_EXTRUDE6_END_RADIUS, 180.662, mode=Mode.PRIVATE)
    # Sketch8 → Cut-Extrude6 (cut, up to the surface)
    with BuildSketch(Plane.XY.offset(36), mode=Mode.PRIVATE) as cut_extrude6_sk1:
        with Locations((37, 0)):
            Circle(SKETCH8_R)
    cut_extrude6_tool1 = extrude(cut_extrude6_sk1.sketch, amount=-CUT_EXTRUDE6_REACH, mode=Mode.PRIVATE) - cut_extrude6_end
    add(cut_extrude6_tool1.solids().sort_by_distance((37, 0, 36))[0], mode=Mode.SUBTRACT)

    # Cut-Extrude7: up to this cylinder (the profile starts outside it)
    cut_extrude7_end = Plane(origin=(37, 0, -25), z_dir=(0, 1, 0)) * Cylinder(CUT_EXTRUDE7_END_RADIUS, 157.966, mode=Mode.PRIVATE)
    # Sketch7 → Cut-Extrude7 (cut, up to the surface)
    with BuildSketch(Plane(origin=(-4.093251906, 0, -4.878147664), x_dir=(-0.7660444431189798, 0, 0.6427876096865375), z_dir=(-0.6427876096865375, 0, -0.7660444431189798)), mode=Mode.PRIVATE) as cut_extrude7_sk1:
        with Locations((-44.413334638, 0)):
            Circle(SKETCH7_R)
    cut_extrude7_tool1 = extrude(cut_extrude7_sk1.sketch, amount=-CUT_EXTRUDE7_REACH, mode=Mode.PRIVATE) - cut_extrude7_end
    add(cut_extrude7_tool1.solids().sort_by_distance((29.929336, 0, -33.426489))[0], mode=Mode.SUBTRACT)

    # Cut-Extrude8: up to this cylinder (the profile starts outside it)
    cut_extrude8_end = Plane(origin=(11.457674801, 0, 31.479702796), z_dir=(0, 1, 0)) * Cylinder(CUT_EXTRUDE8_END_RADIUS, 188.062, mode=Mode.PRIVATE)
    # Sketch6 → Cut-Extrude8 (cut, up to the surface)
    with BuildSketch(Plane.XY.offset(41.479702796), mode=Mode.PRIVATE) as cut_extrude8_sk1:
        with Locations((11.457674801, 0)):
            Circle(SKETCH6_R)
    cut_extrude8_tool1 = extrude(cut_extrude8_sk1.sketch, amount=-CUT_EXTRUDE8_REACH, mode=Mode.PRIVATE) - cut_extrude8_end
    add(cut_extrude8_tool1.solids().sort_by_distance((11.457675, 0, 41.479703))[0], mode=Mode.SUBTRACT)

    # Fillet1
    # the kernel refuses this fillet: 10 mm, written as the material it adds along each edge
    with BuildSketch(Plane(origin=(-0.916023693, 0, 30.122369648), x_dir=(-0.573576436351044, 0, 0.8191520442889931), z_dir=(0, -1, 0))) as fillet1_piece_1_section:
        with BuildLine():
            CenterArc((9.851293444, -10), FILLET1_R, 90, 87.504443294)
            ThreePointArc((-0.139222568, -9.564580891), (-0.649847133, -4.7738445), (0, 0))
            Line((0, 0), (9.851293444, 0))
        make_face()
    fillet1_piece_1 = extrude(amount=29.628233611, mode=Mode.PRIVATE)
    fillet1_piece_1 = split(fillet1_piece_1, bisect_by=Plane(origin=(-0.916023693, -4, 30.122369648), z_dir=(0, 1, 0)), keep=Keep.TOP, mode=Mode.PRIVATE)
    add(fillet1_piece_1)
    with BuildSketch(Plane(origin=(-0.916023693, 24.628233611, 30.122369648), x_dir=(-0.573576436351044, 0, 0.8191520442889931), z_dir=(0, -1, 0))) as fillet1_piece_2_section:
        with BuildLine():
            CenterArc((9.851293444, -10), FILLET1_R, 90, 87.504443294)
            ThreePointArc((-0.139222568, -9.564580891), (-0.649847133, -4.7738445), (0, 0))
            Line((0, 0), (9.851293444, 0))
        make_face()
    fillet1_piece_2 = extrude(amount=29.628233611, mode=Mode.PRIVATE)
    fillet1_piece_2 = split(fillet1_piece_2, bisect_by=Plane(origin=(-5.041242688, 24.628233611, 36.013792934), z_dir=(0.5735764363510472, 0, -0.819152044288991)), keep=Keep.TOP, mode=Mode.PRIVATE)
    fillet1_piece_2 = split(fillet1_piece_2, bisect_by=Plane(origin=(-0.916023693, -4, 30.122369648), z_dir=(0, -1, 0)), keep=Keep.TOP, mode=Mode.PRIVATE)
    add(fillet1_piece_2)


solid = part.part
